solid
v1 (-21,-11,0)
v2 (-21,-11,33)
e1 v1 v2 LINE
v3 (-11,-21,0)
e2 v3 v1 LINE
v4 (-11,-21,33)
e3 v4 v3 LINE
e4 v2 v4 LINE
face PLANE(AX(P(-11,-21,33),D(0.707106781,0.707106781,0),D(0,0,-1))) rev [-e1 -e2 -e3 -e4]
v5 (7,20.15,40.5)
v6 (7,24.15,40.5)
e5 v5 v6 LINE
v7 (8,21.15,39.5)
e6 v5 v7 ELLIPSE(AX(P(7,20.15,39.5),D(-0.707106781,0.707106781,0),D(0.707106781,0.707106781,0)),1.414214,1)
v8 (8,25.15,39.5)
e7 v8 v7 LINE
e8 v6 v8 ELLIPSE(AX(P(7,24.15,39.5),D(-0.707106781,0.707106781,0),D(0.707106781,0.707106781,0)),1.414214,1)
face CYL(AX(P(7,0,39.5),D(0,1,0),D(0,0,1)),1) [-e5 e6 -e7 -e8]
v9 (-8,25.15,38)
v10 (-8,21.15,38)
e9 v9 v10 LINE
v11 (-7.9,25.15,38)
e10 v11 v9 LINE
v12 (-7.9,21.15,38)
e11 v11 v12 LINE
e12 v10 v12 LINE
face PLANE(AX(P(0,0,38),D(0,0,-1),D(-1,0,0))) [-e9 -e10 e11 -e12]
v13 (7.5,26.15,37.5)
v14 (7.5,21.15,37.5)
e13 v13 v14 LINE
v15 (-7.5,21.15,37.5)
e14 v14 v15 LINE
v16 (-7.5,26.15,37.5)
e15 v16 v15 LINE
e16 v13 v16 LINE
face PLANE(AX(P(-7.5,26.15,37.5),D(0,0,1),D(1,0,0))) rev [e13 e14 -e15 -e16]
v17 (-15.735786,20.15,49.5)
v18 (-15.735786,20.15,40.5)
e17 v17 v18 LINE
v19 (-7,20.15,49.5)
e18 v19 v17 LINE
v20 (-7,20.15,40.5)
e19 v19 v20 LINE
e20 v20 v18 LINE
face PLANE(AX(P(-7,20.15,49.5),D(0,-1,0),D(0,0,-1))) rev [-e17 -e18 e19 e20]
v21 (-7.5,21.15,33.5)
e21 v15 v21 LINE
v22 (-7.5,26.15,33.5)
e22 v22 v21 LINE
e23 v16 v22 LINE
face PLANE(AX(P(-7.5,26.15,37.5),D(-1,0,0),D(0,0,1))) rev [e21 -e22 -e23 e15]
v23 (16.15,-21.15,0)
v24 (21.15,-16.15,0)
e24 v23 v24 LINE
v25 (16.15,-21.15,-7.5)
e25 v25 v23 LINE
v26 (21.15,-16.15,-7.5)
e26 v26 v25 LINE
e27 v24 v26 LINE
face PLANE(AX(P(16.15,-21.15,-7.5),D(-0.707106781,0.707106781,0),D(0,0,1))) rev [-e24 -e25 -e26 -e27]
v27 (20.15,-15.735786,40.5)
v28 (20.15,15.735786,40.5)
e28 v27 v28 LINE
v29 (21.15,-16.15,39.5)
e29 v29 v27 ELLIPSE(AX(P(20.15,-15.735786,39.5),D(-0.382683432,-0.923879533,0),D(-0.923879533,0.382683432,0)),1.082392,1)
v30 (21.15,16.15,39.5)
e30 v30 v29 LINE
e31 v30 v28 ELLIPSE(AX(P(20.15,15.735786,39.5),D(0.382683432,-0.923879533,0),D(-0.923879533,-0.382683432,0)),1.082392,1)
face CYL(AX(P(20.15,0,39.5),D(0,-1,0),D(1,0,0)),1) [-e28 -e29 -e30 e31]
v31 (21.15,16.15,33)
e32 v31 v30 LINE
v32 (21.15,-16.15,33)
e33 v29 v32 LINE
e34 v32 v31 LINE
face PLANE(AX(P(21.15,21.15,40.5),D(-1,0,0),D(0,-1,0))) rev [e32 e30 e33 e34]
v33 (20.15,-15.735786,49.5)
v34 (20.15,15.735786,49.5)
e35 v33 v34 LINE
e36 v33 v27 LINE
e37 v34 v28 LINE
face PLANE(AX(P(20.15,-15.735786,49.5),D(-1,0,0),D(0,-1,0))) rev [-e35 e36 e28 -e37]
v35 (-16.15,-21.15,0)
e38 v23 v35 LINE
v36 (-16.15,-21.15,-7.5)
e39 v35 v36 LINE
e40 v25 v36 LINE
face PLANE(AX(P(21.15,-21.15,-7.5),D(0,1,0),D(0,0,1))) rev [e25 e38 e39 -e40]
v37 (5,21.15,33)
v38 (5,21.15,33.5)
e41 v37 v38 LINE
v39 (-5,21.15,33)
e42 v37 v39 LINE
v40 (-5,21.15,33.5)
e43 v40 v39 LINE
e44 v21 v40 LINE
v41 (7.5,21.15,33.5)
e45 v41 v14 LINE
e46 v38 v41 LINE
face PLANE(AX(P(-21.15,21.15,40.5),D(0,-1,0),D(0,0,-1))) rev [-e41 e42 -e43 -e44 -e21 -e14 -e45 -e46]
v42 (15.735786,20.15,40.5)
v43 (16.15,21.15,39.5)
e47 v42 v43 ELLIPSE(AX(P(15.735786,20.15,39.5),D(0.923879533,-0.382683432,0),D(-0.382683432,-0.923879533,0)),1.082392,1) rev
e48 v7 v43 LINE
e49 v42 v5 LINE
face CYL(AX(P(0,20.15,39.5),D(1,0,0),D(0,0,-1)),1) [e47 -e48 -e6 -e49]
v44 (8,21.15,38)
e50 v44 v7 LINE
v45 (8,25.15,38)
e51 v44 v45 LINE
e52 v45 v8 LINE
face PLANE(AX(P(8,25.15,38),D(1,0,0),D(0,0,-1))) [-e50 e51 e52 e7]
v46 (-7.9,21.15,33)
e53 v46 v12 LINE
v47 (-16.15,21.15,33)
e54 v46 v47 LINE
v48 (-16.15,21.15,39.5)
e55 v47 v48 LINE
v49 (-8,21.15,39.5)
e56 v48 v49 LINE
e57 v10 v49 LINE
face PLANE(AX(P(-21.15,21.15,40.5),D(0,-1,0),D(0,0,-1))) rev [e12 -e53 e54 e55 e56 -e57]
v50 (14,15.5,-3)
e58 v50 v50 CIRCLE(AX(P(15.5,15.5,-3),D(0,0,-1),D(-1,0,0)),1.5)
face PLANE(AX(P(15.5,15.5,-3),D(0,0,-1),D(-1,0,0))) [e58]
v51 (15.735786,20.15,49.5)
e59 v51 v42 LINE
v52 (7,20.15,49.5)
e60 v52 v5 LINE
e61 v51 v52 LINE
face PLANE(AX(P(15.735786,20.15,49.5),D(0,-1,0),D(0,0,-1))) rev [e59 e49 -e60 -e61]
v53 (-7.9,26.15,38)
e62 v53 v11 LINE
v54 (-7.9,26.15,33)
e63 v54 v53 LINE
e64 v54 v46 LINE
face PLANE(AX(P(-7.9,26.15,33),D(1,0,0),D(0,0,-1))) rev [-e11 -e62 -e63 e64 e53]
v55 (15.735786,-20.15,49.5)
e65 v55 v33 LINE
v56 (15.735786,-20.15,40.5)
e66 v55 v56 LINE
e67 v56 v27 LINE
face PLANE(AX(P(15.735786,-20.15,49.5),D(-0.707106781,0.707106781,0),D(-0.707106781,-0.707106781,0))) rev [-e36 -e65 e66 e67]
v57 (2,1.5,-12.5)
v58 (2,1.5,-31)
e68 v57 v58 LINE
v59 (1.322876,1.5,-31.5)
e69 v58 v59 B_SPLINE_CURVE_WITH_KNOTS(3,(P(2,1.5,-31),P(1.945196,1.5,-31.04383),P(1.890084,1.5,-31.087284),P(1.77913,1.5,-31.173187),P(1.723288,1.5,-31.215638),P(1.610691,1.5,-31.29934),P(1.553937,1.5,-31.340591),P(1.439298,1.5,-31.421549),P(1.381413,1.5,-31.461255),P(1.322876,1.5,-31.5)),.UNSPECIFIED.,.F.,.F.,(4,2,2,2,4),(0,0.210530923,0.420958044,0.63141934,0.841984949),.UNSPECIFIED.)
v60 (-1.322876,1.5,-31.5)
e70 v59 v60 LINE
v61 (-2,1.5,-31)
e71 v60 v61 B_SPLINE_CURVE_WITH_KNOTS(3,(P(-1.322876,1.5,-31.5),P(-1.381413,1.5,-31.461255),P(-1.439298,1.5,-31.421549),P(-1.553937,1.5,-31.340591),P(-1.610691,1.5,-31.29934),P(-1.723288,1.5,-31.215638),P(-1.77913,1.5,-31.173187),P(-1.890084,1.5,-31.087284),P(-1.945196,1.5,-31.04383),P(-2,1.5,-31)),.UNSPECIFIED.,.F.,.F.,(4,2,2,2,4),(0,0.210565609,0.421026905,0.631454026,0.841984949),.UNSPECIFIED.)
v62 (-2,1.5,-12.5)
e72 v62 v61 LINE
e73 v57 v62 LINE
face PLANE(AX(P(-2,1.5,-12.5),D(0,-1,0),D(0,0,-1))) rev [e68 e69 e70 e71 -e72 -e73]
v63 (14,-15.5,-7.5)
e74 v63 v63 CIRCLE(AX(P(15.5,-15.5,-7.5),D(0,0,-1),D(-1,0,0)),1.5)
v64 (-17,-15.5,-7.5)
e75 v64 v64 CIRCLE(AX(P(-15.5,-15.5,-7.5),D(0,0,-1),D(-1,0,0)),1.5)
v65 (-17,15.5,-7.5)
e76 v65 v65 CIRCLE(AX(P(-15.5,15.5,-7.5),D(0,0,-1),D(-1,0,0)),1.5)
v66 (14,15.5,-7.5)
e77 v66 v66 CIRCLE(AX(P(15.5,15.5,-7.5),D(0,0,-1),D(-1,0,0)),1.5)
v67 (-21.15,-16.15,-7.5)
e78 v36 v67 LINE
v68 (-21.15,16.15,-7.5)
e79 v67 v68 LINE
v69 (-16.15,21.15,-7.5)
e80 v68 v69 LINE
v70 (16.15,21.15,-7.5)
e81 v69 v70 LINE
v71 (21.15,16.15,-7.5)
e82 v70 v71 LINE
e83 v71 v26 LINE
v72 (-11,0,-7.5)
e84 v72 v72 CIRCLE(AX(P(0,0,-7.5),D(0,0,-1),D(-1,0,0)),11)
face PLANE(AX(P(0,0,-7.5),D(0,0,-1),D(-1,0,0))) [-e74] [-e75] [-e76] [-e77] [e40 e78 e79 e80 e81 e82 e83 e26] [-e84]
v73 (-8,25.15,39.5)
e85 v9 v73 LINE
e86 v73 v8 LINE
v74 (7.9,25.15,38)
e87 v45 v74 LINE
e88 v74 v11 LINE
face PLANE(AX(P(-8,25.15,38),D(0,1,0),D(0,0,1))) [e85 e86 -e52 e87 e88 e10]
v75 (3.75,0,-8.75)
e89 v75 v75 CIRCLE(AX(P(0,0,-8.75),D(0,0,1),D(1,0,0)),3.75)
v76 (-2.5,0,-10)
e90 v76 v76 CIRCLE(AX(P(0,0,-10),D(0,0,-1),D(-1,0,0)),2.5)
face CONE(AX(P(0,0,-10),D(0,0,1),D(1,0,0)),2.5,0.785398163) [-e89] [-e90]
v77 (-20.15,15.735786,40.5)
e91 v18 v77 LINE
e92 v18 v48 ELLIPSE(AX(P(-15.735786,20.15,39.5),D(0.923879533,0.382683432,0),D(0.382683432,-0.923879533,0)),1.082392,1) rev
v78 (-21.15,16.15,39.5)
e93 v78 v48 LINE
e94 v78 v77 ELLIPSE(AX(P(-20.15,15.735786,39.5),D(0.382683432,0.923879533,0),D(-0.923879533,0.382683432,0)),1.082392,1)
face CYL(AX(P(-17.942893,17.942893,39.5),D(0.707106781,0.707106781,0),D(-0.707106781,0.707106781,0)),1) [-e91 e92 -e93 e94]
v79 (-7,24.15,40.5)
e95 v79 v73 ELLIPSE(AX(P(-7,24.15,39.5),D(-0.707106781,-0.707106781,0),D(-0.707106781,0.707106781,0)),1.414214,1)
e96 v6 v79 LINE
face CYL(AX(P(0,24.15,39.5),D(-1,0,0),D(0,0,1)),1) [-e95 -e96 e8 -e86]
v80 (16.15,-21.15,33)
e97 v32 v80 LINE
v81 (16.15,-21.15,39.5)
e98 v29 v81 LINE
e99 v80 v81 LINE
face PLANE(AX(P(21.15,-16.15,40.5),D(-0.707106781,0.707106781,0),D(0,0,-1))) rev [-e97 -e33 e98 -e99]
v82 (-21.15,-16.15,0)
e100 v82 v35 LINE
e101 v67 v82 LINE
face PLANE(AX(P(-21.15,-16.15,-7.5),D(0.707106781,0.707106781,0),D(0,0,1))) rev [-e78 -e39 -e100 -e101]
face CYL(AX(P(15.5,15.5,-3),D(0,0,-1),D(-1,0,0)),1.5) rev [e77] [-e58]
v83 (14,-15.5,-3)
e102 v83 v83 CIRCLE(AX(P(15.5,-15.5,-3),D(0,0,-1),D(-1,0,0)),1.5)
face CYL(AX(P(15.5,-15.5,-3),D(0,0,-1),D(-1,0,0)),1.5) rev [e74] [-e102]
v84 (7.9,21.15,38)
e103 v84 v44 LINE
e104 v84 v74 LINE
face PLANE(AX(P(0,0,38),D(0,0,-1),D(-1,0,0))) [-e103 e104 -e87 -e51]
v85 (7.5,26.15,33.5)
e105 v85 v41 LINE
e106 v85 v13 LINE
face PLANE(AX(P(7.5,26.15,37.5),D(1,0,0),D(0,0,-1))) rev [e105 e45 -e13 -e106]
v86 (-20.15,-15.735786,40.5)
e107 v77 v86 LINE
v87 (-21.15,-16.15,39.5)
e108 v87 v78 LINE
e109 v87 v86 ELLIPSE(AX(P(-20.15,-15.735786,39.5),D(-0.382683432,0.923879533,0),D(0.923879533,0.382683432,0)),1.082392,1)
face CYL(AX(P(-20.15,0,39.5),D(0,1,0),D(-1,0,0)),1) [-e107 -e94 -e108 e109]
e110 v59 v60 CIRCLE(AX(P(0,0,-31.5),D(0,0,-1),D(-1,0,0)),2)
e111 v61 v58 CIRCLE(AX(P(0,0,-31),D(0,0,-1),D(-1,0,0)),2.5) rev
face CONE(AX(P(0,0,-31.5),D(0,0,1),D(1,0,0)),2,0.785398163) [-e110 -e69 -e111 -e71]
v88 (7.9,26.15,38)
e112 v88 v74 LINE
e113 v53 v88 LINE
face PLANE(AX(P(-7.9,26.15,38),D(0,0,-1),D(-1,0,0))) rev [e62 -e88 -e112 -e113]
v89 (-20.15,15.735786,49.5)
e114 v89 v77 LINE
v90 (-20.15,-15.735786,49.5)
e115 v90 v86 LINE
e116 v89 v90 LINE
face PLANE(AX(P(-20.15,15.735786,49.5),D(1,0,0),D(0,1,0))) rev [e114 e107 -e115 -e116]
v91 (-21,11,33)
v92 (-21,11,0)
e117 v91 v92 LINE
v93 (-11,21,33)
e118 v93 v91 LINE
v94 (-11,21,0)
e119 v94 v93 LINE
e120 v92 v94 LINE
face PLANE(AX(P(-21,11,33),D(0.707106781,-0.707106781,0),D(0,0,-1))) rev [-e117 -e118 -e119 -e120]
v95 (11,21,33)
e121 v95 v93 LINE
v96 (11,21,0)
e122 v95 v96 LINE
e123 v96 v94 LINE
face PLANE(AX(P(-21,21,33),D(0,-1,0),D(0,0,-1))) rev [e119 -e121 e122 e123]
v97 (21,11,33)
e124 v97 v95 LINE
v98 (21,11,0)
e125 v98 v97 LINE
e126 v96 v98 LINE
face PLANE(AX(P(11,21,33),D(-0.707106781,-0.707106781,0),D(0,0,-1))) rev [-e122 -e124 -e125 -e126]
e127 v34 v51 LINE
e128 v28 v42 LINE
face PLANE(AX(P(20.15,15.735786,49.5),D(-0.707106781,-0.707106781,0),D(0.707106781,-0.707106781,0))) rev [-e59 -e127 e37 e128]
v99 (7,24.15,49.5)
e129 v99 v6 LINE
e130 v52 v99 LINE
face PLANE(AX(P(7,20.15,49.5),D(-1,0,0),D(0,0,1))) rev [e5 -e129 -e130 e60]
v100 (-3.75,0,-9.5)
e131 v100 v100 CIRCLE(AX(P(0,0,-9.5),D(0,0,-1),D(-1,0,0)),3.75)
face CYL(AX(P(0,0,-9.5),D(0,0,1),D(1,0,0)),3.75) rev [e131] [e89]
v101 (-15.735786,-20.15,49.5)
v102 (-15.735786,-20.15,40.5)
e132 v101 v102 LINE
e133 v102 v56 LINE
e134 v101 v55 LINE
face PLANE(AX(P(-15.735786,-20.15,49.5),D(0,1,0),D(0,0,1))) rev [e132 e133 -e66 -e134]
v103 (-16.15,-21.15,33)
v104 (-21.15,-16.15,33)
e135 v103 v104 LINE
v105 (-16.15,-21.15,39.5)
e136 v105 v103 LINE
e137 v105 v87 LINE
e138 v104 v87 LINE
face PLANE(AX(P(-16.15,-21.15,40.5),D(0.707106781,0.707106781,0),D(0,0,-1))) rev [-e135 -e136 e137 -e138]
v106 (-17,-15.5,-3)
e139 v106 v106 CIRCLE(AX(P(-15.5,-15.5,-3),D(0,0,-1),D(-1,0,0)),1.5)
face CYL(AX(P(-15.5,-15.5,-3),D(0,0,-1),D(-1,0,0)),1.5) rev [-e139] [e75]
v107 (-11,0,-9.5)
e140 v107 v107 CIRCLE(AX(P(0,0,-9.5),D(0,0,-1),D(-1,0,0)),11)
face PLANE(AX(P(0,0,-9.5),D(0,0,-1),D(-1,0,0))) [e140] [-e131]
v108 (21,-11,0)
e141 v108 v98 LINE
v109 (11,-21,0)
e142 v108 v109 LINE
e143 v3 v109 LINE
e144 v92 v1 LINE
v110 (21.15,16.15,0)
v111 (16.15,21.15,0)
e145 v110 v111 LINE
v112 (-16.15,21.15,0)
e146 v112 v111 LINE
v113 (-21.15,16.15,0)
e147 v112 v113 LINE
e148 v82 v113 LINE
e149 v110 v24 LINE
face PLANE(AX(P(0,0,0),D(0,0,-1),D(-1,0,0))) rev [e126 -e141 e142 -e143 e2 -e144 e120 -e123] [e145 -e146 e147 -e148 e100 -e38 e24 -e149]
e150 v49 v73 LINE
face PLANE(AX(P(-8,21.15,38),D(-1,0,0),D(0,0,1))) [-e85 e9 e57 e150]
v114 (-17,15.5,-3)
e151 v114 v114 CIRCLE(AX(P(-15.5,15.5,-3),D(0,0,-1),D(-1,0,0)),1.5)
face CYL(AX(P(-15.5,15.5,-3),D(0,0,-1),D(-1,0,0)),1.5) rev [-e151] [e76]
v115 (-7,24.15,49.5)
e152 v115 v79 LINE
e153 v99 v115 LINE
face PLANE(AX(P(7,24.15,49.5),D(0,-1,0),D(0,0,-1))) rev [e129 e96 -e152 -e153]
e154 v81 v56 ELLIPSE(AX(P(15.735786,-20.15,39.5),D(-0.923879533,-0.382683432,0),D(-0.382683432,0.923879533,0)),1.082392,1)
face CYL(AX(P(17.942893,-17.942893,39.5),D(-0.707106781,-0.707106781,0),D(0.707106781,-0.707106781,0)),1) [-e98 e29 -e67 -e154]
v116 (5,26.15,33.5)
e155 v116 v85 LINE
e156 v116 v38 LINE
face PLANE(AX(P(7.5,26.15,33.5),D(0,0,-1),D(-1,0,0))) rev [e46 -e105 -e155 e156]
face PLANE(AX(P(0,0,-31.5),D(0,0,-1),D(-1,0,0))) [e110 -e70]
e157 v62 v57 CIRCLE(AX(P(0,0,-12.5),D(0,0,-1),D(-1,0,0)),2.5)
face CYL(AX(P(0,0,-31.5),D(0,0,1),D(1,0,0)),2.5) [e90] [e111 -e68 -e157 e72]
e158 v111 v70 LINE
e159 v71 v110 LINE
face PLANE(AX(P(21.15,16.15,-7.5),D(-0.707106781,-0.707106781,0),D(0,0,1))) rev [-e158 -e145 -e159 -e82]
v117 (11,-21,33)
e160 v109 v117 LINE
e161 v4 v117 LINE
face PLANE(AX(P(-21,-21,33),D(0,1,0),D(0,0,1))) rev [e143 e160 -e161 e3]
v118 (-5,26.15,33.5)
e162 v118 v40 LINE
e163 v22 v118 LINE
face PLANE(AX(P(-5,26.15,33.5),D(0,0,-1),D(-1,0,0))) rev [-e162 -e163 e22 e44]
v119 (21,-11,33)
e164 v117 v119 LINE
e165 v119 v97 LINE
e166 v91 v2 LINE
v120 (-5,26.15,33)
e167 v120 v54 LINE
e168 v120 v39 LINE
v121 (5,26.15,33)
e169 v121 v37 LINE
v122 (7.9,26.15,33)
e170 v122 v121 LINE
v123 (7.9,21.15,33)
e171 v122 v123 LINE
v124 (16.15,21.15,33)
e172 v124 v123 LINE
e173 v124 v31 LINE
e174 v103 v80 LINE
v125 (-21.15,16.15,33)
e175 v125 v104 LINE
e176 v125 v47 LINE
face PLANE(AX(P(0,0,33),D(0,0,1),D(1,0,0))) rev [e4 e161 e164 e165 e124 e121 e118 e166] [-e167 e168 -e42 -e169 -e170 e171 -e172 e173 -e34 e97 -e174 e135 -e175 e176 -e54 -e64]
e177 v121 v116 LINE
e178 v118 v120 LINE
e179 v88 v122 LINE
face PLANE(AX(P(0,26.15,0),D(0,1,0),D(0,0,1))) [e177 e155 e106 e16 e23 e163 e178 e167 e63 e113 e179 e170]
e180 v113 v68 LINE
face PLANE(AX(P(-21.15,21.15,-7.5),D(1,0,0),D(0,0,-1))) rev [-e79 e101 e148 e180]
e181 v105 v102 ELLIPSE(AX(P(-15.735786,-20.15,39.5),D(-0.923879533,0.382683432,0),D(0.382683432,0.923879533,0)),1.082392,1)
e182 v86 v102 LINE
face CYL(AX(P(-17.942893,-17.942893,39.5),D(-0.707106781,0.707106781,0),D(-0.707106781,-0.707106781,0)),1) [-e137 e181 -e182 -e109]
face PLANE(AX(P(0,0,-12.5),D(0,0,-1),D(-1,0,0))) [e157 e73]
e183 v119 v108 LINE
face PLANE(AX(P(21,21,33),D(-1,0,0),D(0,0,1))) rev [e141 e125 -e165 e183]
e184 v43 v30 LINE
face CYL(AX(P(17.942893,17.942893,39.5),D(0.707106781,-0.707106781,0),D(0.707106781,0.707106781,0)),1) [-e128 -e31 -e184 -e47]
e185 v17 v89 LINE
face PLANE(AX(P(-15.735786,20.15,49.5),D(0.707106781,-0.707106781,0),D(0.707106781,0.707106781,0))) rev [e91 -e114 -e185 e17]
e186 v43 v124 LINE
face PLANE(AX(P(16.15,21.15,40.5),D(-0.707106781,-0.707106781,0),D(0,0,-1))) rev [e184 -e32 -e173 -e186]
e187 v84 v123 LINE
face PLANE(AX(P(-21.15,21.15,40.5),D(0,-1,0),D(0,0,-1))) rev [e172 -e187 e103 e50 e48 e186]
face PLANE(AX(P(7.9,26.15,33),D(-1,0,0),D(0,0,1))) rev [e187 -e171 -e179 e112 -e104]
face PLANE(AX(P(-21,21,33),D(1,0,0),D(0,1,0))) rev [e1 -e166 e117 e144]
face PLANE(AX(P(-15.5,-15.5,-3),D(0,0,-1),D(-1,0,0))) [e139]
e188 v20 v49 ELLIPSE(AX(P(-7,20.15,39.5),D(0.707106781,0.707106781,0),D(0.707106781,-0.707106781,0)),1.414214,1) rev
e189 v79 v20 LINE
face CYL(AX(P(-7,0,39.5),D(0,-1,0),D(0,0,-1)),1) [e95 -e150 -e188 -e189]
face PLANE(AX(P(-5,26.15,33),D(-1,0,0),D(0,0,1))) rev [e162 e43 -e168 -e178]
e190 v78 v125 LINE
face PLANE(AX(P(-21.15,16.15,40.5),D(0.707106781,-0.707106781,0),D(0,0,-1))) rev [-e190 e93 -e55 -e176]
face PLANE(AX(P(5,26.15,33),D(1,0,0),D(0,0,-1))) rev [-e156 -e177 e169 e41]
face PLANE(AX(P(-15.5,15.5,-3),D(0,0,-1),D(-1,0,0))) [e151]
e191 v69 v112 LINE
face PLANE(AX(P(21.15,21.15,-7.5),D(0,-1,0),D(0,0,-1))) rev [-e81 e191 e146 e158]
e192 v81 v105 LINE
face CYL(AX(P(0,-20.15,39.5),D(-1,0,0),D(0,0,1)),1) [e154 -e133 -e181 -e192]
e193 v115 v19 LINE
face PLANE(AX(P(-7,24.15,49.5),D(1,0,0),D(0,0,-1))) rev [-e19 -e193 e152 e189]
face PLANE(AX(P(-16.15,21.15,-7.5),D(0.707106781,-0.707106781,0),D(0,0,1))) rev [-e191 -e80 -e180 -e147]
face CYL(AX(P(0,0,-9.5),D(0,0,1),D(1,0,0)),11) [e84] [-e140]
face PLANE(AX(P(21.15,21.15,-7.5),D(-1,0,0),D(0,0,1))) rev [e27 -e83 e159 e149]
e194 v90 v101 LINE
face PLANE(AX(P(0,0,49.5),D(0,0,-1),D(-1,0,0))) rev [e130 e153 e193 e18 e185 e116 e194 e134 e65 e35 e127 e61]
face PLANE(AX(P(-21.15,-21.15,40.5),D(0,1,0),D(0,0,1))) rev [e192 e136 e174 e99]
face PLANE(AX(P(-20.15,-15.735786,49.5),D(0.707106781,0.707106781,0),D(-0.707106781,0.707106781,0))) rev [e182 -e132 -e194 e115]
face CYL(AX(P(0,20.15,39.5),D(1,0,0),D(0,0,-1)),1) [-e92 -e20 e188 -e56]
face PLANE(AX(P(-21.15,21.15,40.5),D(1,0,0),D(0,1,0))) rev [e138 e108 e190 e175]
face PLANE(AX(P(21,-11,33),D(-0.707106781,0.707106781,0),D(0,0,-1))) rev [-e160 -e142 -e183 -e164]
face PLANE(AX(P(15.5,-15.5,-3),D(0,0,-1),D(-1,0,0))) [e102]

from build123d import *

# Parameters (mm, degrees)
SKETCH_1_W          = 42
SKETCH_1_H          = 42
EXTRUDE_1_DEPTH     = 33
CHAMFER_1_SIZE      = 10
SKETCH_2_W          = 42.3
SKETCH_2_H          = 42.3
EXTRUDE_2_DEPTH     = 7.5
SKETCH_3_W          = 42.3
SKETCH_3_H          = 42.3
EXTRUDE_3_DEPTH     = 7.5
CHAMFER_2_SIZE      = 5
SKETCH_4_R          = 1.5
CUT_EXTRUDE_1_DEPTH = 4.5
SKETCH_5_R          = 11
SKETCH_5_R_2        = 3.75
EXTRUDE_4_DEPTH     = 2
SKETCH_6_R          = 2.5
EXTRUDE_5_DEPTH     = 24
CUT_EXTRUDE_START   = -19
CUT_EXTRUDE_2_DEPTH = 19
CHAMFER_3_SIZE      = 0.5
EXTRUDE_6_DEPTH     = 2.5
FILLET_1_R          = 1
EXTRUDE_7_DEPTH     = 5
EXTRUDE_8_DEPTH     = 9
CHAMFER_4_SIZE      = 2.5


with BuildPart() as part:
    # 草图1 → 凸台-拉伸1 (new body)
    with BuildSketch(Plane.XY):
        Rectangle(SKETCH_1_W, SKETCH_1_H)
    extrude(amount=EXTRUDE_1_DEPTH)

    # 倒角1
    chamfer_1_edges = [part.edges().sort_by_distance(p)[0] for p in [
        (21, -21, 16.5),
        (-21, -21, 16.5),
        (-21, 21, 16.5),
        (21, 21, 16.5),
    ]]
    chamfer(chamfer_1_edges, length=CHAMFER_1_SIZE)

    # 草图2 → 凸台-拉伸2 (add)
    with BuildSketch(Plane.XY.offset(33)):
        Rectangle(SKETCH_2_W, SKETCH_2_H)
    extrude(amount=EXTRUDE_2_DEPTH)

    # 草图3 → 凸台-拉伸3 (add)
    with BuildSketch(Plane(origin=(0, 0, 0), x_dir=(-1, 0, 0), z_dir=(0, 0, -1))):
        Rectangle(SKETCH_3_W, SKETCH_3_H)
    extrude(amount=EXTRUDE_3_DEPTH)

    # 倒角2
    chamfer_2_edges = [part.edges().sort_by_distance(p)[0] for p in [
        (21.15, -21.15, 36.75),
        (21.15, 21.15, 36.75),
        (-21.15, 21.15, 36.75),
        (-21.15, -21.15, 36.75),
        (-21.15, -21.15, -3.75),
        (-21.15, 21.15, -3.75),
        (21.15, 21.15, -3.75),
        (21.15, -21.15, -3.75),
    ]]
    chamfer(chamfer_2_edges, length=CHAMFER_2_SIZE)

    # 草图4 → 切除-拉伸1 (cut)
    with BuildSketch(Plane(origin=(0, 0, -7.5), x_dir=(-1, 0, 0), z_dir=(0, 0, -1))):
        with Locations((-15.5, 15.5)):
            Circle(SKETCH_4_R)
        with Locations((15.5, 15.5)):
            Circle(SKETCH_4_R)
        with Locations((15.5, -15.5)):
            Circle(SKETCH_4_R)
        with Locations((-15.5, -15.5)):
            Circle(SKETCH_4_R)
    extrude(amount=-CUT_EXTRUDE_1_DEPTH, mode=Mode.SUBTRACT)

    # 草图5 → 凸台-拉伸4 (add)
    with BuildSketch(Plane(origin=(0, 0, -7.5), x_dir=(-1, 0, 0), z_dir=(0, 0, -1))):
        Circle(SKETCH_5_R)
        Circle(SKETCH_5_R_2, mode=Mode.SUBTRACT)
    extrude(amount=EXTRUDE_4_DEPTH)

    # 草图6 → 凸台-拉伸5 (add)
    with BuildSketch(Plane(origin=(0, 0, -7.5), x_dir=(-1, 0, 0), z_dir=(0, 0, -1))):
        Circle(SKETCH_6_R)
    extrude(amount=EXTRUDE_5_DEPTH)

    # 草图7 → 切除-拉伸2 (cut)
    with BuildSketch(Plane(origin=(0, 0, -31.5), x_dir=(-1, 0, 0), z_dir=(0, 0, -1)).offset(CUT_EXTRUDE_START)):
        with BuildLine():
            Line((2, 1.5), (-2, 1.5))
            ThreePointArc((-2, 1.5), (0, 2.5), (2, 1.5))
        make_face()
    extrude(amount=CUT_EXTRUDE_2_DEPTH, mode=Mode.SUBTRACT)

    # 倒角3
    chamfer_3_edges = [part.edges().sort_by_distance(p)[0] for p in [
        (0.790569415, -2.371708245, -31.5),
    ]]
    chamfer(chamfer_3_edges, length=CHAMFER_3_SIZE)

    # 草图8 → 凸台-拉伸6 (add)
    with BuildSketch(Plane.XY.offset(40.5)):
        Polygon((0, 21.15), (-8, 21.15), (-8, 25.15), (8, 25.15), (8, 21.15), align=None)
    extrude(amount=-EXTRUDE_6_DEPTH)

    # 圆角1
    fillet_1_edges = [part.edges().sort_by_distance(p)[0] for p in [
        (-12.075, 21.15, 40.5),
        (8, 23.15, 40.5),
        (0, 25.15, 40.5),
        (-8, 23.15, 40.5),
        (0, -21.15, 40.5),
        (-21.15, 0, 40.5),
        (21.15, 0, 40.5),
        (12.075, 21.15, 40.5),
        (-18.65, 18.65, 40.5),
        (18.65, 18.65, 40.5),
        (18.65, -18.65, 40.5),
        (-18.65, -18.65, 40.5),
    ]]
    fillet(fillet_1_edges, radius=FILLET_1_R)

    # 草图9 → 凸台-拉伸7 (add)
    with BuildSketch(Plane(origin=(0, 21.15, 0), x_dir=(1, 0, 0), z_dir=(0, 1, 0))):
        Polygon((7.9, -33), (5, -33), (5, -33.5), (7.5, -33.5), (7.5, -37.5), (-7.5, -37.5), (-7.5, -33.5), (-5, -33.5), (-5, -33), (-7.9, -33), (-7.9, -38), (7.9, -38), align=None)
    extrude(amount=EXTRUDE_7_DEPTH)

    # 草图10 → 凸台-拉伸8 (add)
    with BuildSketch(Plane.XY.offset(40.5)):
        Polygon((-7, 20.15), (-15.735786438, 20.15), (-20.15, 15.735786438), (-20.15, -15.735786438), (-15.735786438, -20.15), (15.735786438, -20.15), (20.15, -15.735786438), (20.15, 15.735786438), (15.735786438, 20.15), (7, 20.15), (7, 24.15), (-7, 24.15), align=None)
    extrude(amount=EXTRUDE_8_DEPTH)

    # 倒角4
    # the kernel refuses this chamfer: 2.5 mm, written as the material it adds along each edge
    with BuildSketch(Plane(origin=(0, 0, -7.5), x_dir=(-1, 0, 0), z_dir=(0, -1, 0))) as chamfer_4_piece_1:
        Polygon((2.5 + CHAMFER_4_SIZE, 0), (2.5, CHAMFER_4_SIZE), (2.5, 0), align=None)
    revolve(axis=Axis((0, 0, -7.5), (0, 0, -1)))


solid = part.part
